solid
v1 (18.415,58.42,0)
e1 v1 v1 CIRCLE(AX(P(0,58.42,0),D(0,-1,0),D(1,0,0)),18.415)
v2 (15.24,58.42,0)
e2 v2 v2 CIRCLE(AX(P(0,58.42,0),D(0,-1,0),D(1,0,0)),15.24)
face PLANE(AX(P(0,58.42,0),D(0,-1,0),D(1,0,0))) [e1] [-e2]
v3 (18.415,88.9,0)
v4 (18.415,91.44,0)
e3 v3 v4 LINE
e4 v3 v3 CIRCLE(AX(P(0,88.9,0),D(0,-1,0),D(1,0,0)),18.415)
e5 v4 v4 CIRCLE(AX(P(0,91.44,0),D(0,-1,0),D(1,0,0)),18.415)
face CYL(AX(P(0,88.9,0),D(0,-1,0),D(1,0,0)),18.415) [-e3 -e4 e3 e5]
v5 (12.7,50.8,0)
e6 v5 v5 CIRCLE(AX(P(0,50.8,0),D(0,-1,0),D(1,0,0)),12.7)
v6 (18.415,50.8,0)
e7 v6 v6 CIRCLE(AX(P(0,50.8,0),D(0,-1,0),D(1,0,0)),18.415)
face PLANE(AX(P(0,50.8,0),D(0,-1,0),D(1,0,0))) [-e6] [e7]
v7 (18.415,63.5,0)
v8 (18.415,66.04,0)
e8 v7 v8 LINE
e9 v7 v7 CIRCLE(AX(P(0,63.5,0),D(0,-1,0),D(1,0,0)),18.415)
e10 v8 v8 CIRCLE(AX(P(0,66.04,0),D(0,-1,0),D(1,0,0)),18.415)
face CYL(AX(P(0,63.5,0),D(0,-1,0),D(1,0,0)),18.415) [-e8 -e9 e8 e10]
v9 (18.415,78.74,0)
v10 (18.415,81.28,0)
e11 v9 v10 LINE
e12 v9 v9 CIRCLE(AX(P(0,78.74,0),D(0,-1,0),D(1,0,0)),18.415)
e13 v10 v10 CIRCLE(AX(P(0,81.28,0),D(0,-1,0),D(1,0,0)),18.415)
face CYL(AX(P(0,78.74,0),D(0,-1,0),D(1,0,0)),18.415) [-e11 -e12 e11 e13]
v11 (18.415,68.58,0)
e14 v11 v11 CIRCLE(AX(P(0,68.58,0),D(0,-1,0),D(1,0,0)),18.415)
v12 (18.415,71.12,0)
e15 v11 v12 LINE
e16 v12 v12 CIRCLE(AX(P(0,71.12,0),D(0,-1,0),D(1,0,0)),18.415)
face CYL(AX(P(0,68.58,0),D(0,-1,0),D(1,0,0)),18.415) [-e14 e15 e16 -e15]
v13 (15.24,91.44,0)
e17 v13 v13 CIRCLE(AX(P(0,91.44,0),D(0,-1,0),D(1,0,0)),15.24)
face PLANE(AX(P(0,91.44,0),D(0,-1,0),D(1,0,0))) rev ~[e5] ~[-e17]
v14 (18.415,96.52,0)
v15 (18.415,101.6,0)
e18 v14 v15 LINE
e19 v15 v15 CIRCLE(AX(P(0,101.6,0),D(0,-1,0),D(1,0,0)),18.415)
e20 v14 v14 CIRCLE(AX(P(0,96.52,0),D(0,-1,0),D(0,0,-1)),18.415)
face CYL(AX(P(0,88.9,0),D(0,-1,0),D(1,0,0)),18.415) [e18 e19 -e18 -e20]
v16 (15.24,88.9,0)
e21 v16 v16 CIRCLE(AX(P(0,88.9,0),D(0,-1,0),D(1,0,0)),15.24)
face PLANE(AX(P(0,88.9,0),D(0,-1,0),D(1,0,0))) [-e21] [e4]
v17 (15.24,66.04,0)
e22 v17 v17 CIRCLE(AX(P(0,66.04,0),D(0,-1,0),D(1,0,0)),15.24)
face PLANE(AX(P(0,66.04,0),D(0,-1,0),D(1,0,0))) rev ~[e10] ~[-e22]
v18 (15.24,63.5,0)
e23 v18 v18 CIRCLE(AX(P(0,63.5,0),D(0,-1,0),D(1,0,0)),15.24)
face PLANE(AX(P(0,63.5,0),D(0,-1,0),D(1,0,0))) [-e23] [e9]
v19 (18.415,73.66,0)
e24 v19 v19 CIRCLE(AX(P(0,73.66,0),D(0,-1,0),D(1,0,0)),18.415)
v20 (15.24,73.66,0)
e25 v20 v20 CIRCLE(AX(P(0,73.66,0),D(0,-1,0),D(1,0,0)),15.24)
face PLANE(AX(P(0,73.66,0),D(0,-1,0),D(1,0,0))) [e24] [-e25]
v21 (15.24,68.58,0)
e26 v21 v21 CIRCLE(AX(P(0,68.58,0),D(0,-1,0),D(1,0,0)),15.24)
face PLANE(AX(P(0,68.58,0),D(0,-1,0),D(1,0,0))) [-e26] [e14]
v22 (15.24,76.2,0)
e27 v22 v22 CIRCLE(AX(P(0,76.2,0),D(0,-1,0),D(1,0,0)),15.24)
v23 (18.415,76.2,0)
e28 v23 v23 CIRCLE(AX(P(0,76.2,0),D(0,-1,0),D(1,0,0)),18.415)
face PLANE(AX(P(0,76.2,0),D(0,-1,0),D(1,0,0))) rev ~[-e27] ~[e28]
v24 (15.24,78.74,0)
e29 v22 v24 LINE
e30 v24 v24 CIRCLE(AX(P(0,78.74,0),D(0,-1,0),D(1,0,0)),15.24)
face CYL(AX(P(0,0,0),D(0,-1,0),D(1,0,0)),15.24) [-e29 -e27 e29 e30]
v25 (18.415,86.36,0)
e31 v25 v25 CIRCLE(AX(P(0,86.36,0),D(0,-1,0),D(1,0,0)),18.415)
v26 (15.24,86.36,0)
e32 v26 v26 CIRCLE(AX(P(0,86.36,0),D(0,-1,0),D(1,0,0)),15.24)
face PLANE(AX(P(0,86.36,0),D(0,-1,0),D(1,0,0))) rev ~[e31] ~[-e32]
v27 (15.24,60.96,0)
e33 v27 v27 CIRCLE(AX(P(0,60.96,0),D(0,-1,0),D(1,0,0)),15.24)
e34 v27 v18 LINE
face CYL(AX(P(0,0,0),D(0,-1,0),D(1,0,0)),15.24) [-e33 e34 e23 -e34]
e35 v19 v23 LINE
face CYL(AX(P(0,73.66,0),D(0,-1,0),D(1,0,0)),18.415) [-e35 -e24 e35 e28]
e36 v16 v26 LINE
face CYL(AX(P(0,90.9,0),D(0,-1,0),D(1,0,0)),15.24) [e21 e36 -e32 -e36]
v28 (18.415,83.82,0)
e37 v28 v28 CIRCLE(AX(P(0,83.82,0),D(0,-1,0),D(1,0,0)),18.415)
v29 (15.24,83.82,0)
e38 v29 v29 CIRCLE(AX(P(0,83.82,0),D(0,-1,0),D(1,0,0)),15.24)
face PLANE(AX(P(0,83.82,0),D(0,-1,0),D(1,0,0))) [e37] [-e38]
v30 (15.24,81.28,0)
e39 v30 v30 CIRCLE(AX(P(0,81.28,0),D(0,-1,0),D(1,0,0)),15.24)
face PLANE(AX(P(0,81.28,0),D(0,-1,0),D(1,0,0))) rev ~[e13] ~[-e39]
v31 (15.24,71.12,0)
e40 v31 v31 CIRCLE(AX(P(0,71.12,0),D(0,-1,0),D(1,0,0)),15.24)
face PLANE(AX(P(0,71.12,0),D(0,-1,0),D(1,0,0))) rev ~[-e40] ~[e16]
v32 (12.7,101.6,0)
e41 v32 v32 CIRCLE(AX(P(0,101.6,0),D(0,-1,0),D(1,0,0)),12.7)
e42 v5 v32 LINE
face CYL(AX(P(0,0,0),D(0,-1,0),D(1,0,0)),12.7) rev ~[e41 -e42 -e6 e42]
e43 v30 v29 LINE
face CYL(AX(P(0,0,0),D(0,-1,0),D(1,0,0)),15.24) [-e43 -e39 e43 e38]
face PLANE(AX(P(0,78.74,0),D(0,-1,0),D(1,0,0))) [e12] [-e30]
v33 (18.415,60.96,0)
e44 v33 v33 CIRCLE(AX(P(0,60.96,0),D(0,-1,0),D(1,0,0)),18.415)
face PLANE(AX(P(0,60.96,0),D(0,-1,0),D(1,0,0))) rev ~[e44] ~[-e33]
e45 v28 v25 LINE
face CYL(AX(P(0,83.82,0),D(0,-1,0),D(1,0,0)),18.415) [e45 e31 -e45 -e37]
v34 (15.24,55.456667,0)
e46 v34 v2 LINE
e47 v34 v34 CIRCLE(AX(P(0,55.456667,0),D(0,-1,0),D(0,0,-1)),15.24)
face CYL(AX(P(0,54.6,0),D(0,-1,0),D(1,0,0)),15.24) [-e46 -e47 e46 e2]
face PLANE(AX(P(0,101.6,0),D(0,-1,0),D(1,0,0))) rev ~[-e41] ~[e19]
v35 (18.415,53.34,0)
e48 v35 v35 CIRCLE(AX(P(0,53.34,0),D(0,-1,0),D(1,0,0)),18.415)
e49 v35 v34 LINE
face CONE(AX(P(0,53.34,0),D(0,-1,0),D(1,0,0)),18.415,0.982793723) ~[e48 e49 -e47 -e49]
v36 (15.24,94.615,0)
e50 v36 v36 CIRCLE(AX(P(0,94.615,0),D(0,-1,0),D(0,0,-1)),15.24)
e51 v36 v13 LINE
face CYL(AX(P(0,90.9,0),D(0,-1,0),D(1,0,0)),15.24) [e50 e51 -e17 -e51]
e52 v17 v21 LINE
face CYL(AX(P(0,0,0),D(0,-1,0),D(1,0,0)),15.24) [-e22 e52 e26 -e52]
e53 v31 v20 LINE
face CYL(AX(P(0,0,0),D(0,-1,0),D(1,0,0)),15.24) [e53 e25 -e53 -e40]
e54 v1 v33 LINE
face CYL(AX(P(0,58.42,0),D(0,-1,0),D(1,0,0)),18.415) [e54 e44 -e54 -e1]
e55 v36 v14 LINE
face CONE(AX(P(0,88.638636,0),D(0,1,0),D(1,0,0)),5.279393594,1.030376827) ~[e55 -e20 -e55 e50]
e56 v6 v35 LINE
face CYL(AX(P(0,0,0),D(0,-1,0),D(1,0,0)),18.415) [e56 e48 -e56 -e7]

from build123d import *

# Parameters (mm, degrees)
F1_START     = -88.9
F0_R         = 18.415
F0_R_2       = 12.7
F1_DEPTH     = 12.7
F2_START     = -83.82
F2_DEPTH     = 2.54
F3_START     = -78.74
F3_DEPTH     = 2.54
F4_START     = -73.66
F4_DEPTH     = 2.54
F5_START     = -68.58
F5_DEPTH     = 2.54
F6_START     = -63.5
F6_DEPTH     = 2.54
F7_START     = -58.42
F7_DEPTH     = 2.54
F8_DEPTH     = 55.88
F9_R         = 15.24
F9_R_2       = 12.7
F10_DEPTH    = 101.6
F11_S5_R     = 15.24
F11_T6_DEPTH = 28
F12_S5_R     = 15.24
F12_T6_DEPTH = 53
F13_START    = -88.9
F13_DEPTH    = 2.54
F14_DEPTH    = 50.8


# Not quite as in the source:
# - a fillet or chamfer that OpenCascade refuses, or shapes differently, is made with other operations: its cross-section is extruded or revolved along the edge and cut away or added


with BuildPart() as f1:
    # F0 (on Front) → F1 (new body)
    with BuildSketch(Plane.XZ.offset(F1_START)):
        Circle(F0_R)
        Circle(F0_R_2, mode=Mode.SUBTRACT)
    extrude(amount=-F1_DEPTH)



with BuildPart() as f2:
    # F0 (on Front) → F2 (new body)
    with BuildSketch(Plane.XZ.offset(F2_START)):
        Circle(F0_R)
        Circle(F0_R_2, mode=Mode.SUBTRACT)
    extrude(amount=-F2_DEPTH)


with BuildPart() as f3:
    # F0 (on Front) → F3 (new body)
    with BuildSketch(Plane.XZ.offset(F3_START)):
        Circle(F0_R)
        Circle(F0_R_2, mode=Mode.SUBTRACT)
    extrude(amount=-F3_DEPTH)


with BuildPart() as f4:
    # F0 (on Front) → F4 (new body)
    with BuildSketch(Plane.XZ.offset(F4_START)):
        Circle(F0_R)
        Circle(F0_R_2, mode=Mode.SUBTRACT)
    extrude(amount=-F4_DEPTH)


with BuildPart() as f5:
    # F0 (on Front) → F5 (new body)
    with BuildSketch(Plane.XZ.offset(F5_START)):
        Circle(F0_R)
        Circle(F0_R_2, mode=Mode.SUBTRACT)
    extrude(amount=-F5_DEPTH)


with BuildPart() as f6:
    # F0 (on Front) → F6 (new body)
    with BuildSketch(Plane.XZ.offset(F6_START)):
        Circle(F0_R)
        Circle(F0_R_2, mode=Mode.SUBTRACT)
    extrude(amount=-F6_DEPTH)


with BuildPart() as f7:
    # F0 (on Front) → F7 (new body)
    with BuildSketch(Plane.XZ.offset(F7_START)):
        Circle(F0_R)
        Circle(F0_R_2, mode=Mode.SUBTRACT)
    extrude(amount=-F7_DEPTH)


with BuildPart() as f8:
    # F0 (on Front) → F8 (new body)
    with BuildSketch(Plane.XZ):
        Circle(F0_R)
        Circle(F0_R_2, mode=Mode.SUBTRACT)
    extrude(amount=-F8_DEPTH)


with BuildPart() as f1_1:
    add(f1.part)

    add(f2.part)  # F10 merges F2

    add(f3.part)  # F10 merges F3

    add(f4.part)  # F10 merges F4

    add(f5.part)  # F10 merges F5

    add(f6.part)  # F10 merges F6

    add(f7.part)  # F10 merges F7

    add(f8.part)  # F10 merges F8
    # F9 (on Front) → F10 (join)
    with BuildSketch(Plane.XZ):
        Circle(F9_R)
        Circle(F9_R_2, mode=Mode.SUBTRACT)
    extrude(amount=-F10_DEPTH)

    # F11: chamfer of 2.54 x 3.81 on 1 edges, made by hand


with BuildPart() as f11_tool2:
    # F11_s3 → F11_t4 (revolve)
    with BuildSketch(Plane.XY):
        Polygon((18.415, 53.34), (14.605, 55.88), (18.415, 55.88), align=None)
    revolve(axis=Axis((0, 55.88, 0), (0, -1, 0)))

    # F11_s5 → F11_t6 (cut, symmetric)
    with BuildSketch(Plane.XZ.offset(-54.6)):
        Circle(F11_S5_R)
    extrude(amount=F11_T6_DEPTH, both=True, mode=Mode.SUBTRACT)


with BuildPart() as f1_2:
    add(f1_1.part)

    # F11_t1: cut F11_tool2
    add(f11_tool2.part, mode=Mode.SUBTRACT)

    # F12: chamfer of 12.7 x 7.62 on 1 edges, made by hand


with BuildPart() as f12_tool2:
    # F12_s3 → F12_t4 (revolve)
    with BuildSketch(Plane.XY):
        with BuildLine():
            Line((5.2793935937, 88.6386361562), (18.8506064063, 96.7813638438))
            Line((18.8506064063, 96.7813638438), (19.1046064063, 96.7813638438))
            ThreePointArc((19.1046064063, 96.7813638438), (18.669, 92.8406819219), (18.669, 88.9))
            Line((18.669, 88.9), (18.415, 88.646))
            ThreePointArc((18.415, 88.646), (11.8471967969, 88.646), (5.2793935937, 88.3846361562))
            Line((5.2793935937, 88.3846361562), (5.2793935937, 88.6386361562))
        make_face()
    revolve(axis=Axis((0, 88.9, 0), (0, -1, 0)))

    # F12_s5 → F12_t6 (cut, symmetric)
    with BuildSketch(Plane.XZ.offset(-90.9)):
        Circle(F12_S5_R)
    extrude(amount=F12_T6_DEPTH, both=True, mode=Mode.SUBTRACT)


with BuildPart() as f1_3:
    add(f1_2.part)

    # F12_t1: cut F12_tool2
    add(f12_tool2.part, mode=Mode.SUBTRACT)

    # F0 (on Front) → F13 (join)
    with BuildSketch(Plane.XZ.offset(F13_START)):
        Circle(F0_R)
        Circle(F0_R_2, mode=Mode.SUBTRACT)
    extrude(amount=-F13_DEPTH)

    # F0 (on Front) → F14 (cut)
    with BuildSketch(Plane.XZ):
        Circle(F0_R)
        Circle(F0_R_2, mode=Mode.SUBTRACT)
    extrude(amount=-F14_DEPTH, mode=Mode.SUBTRACT)


solid = f1_3.part
